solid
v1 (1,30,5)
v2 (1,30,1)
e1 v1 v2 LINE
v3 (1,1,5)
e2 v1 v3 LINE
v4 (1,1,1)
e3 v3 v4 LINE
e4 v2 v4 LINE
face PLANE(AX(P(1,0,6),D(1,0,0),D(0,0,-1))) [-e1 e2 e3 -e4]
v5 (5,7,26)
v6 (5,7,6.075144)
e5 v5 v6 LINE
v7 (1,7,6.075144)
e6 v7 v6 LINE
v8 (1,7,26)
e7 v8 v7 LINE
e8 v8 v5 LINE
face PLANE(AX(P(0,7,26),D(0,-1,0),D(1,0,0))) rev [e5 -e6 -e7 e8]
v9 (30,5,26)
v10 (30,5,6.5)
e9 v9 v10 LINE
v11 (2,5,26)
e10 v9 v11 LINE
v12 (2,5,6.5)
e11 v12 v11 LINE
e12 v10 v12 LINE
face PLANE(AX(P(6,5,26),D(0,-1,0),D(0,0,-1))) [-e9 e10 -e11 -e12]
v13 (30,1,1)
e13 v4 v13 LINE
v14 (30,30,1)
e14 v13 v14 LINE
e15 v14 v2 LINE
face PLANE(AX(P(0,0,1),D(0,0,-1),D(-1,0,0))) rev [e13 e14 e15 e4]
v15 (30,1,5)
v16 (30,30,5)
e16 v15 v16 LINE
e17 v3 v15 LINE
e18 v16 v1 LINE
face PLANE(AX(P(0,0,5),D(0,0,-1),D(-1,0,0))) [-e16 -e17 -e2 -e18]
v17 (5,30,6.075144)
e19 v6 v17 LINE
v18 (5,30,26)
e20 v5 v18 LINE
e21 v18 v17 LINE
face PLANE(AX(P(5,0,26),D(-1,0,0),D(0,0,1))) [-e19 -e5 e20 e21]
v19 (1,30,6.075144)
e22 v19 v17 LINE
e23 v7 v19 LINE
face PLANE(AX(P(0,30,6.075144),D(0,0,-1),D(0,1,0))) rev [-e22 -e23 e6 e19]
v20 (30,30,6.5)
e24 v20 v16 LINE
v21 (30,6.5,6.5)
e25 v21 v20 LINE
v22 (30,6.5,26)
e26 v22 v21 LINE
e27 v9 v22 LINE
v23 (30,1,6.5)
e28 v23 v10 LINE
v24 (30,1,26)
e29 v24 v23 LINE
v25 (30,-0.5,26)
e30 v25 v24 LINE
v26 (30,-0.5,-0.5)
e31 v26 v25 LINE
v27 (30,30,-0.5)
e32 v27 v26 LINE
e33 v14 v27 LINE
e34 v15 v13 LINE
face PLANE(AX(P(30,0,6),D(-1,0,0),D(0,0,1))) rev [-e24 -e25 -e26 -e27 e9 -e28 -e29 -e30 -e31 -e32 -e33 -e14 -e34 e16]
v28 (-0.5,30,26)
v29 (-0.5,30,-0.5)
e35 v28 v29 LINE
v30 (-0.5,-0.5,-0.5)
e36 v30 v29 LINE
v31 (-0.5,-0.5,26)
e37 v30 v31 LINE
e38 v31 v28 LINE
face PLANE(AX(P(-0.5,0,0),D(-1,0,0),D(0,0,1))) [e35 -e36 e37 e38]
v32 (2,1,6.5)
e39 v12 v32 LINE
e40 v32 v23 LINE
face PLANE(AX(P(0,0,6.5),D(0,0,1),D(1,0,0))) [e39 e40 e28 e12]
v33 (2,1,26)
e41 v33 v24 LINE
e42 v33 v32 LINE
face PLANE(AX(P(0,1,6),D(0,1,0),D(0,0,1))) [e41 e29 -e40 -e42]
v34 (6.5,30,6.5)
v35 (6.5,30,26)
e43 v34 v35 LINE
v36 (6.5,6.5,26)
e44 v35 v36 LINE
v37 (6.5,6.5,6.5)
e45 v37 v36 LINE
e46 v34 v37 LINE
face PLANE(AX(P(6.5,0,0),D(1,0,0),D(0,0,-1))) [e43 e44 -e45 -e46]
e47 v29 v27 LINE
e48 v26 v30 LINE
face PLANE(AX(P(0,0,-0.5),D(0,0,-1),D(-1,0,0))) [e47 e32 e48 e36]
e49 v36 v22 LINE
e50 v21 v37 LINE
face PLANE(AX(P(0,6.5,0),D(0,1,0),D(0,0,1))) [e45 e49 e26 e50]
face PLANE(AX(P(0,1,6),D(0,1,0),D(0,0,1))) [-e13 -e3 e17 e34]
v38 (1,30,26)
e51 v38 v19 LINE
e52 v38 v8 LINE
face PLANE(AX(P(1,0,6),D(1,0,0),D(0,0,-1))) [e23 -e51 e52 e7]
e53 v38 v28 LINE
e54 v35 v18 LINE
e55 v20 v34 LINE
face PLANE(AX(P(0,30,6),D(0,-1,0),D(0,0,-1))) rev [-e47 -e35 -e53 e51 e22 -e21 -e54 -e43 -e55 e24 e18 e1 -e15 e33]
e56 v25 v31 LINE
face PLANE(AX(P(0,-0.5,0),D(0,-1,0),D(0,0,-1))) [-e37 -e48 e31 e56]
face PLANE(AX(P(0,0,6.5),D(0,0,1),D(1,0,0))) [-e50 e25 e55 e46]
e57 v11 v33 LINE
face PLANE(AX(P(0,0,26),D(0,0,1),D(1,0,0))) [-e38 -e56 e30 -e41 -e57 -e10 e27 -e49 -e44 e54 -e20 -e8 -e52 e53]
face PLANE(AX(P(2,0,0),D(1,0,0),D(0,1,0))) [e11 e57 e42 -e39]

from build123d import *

# Parameters (mm, degrees)
SKETCH1_W            = 30
SKETCH1_H            = 30
BOSS_EXTRUDE1_DEPTH  = 6
BOSS_EXTRUDE4_DEPTH  = 20
SKETCH4_W            = 2
SKETCH4_H            = 2
BOSS_EXTRUDE6_DEPTH  = 20
SKETCH5_W            = 24
SKETCH5_H            = 6
BOSS_EXTRUDE7_DEPTH  = 20
SHELL2_START         = 7
SHELL2_DEPTH         = 23
SHELL2_START_2       = 1
SHELL2_2_DEPTH       = 4
SHELL2_START_3       = 5
SHELL2_3_OUTLINE_W   = 29
SHELL2_3_OUTLINE_H   = 4
SHELL2_3_DEPTH       = 2
SKETCH7_W            = 23
SKETCH7_H            = 1
BOSS_EXTRUDE8_DEPTH  = 5
SKETCH9_W            = 1.075143629
SKETCH9_H            = 23
BOSS_EXTRUDE9_DEPTH  = 5
SKETCH10_W           = 4
SKETCH10_H           = 23
CUT_EXTRUDE1_DEPTH   = 10
SKETCH11_W           = 23
SKETCH11_H           = 4
CUT_EXTRUDE2_DEPTH   = 10
BOSS_EXTRUDE10_DEPTH = 20
SKETCH13_W           = 20
SKETCH13_H           = 4
CUT_EXTRUDE3_DEPTH   = 5
SKETCH14_W           = 30
SKETCH14_H           = 26
BOSS_EXTRUDE11_DEPTH = 0.5
SKETCH15_W           = 26
SKETCH15_H           = 30.5
BOSS_EXTRUDE12_DEPTH = 0.5
SKETCH16_W           = 20
SKETCH16_H           = 24
BOSS_EXTRUDE13_DEPTH = 0.5
SKETCH19_W           = 30.5
SKETCH19_H           = 30.5
BOSS_EXTRUDE14_DEPTH = 0.5
SKETCH20_W           = 23.5
SKETCH20_H           = 24
BOSS_EXTRUDE15_DEPTH = 0.5
SKETCH21_W           = 23.5
SKETCH21_H           = 19.5
BOSS_EXTRUDE16_DEPTH = 0.5
SKETCH25_W           = 28
SKETCH25_H           = 4
BOSS_EXTRUDE17_DEPTH = 0.5


# Read off the part's stored shape, not the designer's step: Shell2
with BuildPart() as part:
    # Sketch1 → Boss-Extrude1 (new body)
    with BuildSketch(Plane.XY):
        with Locations((15, 15)):
            Rectangle(SKETCH1_W, SKETCH1_H)
    extrude(amount=BOSS_EXTRUDE1_DEPTH)

    # Sketch2 → Boss-Extrude4 (add)
    with BuildSketch(Plane.XY.offset(6)):
        Polygon((5, 6), (6, 6), (6, 30), (0, 30), (0, 6), align=None)
    extrude(amount=BOSS_EXTRUDE4_DEPTH)

    # Sketch4 → Boss-Extrude6 (add)
    with BuildSketch(Plane.XY.offset(6)):
        with Locations((5, 5)):
            Rectangle(SKETCH4_W, SKETCH4_H)
    extrude(amount=BOSS_EXTRUDE6_DEPTH)

    # Sketch5 → Boss-Extrude7 (add)
    with BuildSketch(Plane.XY.offset(6)):
        with Locations((18, 3)):
            Rectangle(SKETCH5_W, SKETCH5_H)
    extrude(amount=BOSS_EXTRUDE7_DEPTH)

    # Shell2 outline → Shell2 (cut)
    with BuildSketch(Plane(origin=(0, 0, 0), x_dir=(1, 0, 0), z_dir=(0, 1, 0)).offset(SHELL2_START)):
        Polygon((5, -5), (30, -5), (30, -1), (1, -1), (1, -25), (5, -25), align=None)
    extrude(amount=SHELL2_DEPTH, mode=Mode.SUBTRACT)

    # Shell2 2 outline → Shell2 2 (cut)
    with BuildSketch(Plane(origin=(0, 0, 0), x_dir=(1, 0, 0), z_dir=(0, 1, 0)).offset(SHELL2_START_2)):
        Polygon((7, -5), (7, -25), (30, -25), (30, -1), (1, -1), (1, -5), align=None)
    extrude(amount=SHELL2_2_DEPTH, mode=Mode.SUBTRACT)

    # Shell2 3 outline → Shell2 3 (cut)
    with BuildSketch(Plane(origin=(0, 0, 0), x_dir=(1, 0, 0), z_dir=(0, 1, 0)).offset(SHELL2_START_3)):
        with Locations((15.5, -3)):
            Rectangle(SHELL2_3_OUTLINE_W, SHELL2_3_OUTLINE_H)
    extrude(amount=SHELL2_3_DEPTH, mode=Mode.SUBTRACT)

    # Sketch7 → Boss-Extrude8 (add)
    with BuildSketch(Plane.XZ.offset(-5)):
        with Locations((18.5, 5.5)):
            Rectangle(SKETCH7_W, SKETCH7_H)
    extrude(amount=BOSS_EXTRUDE8_DEPTH)

    # Sketch9 → Boss-Extrude9 (add)
    with BuildSketch(Plane.ZY.offset(-5)):
        with Locations((5.537571814, 18.5)):
            Rectangle(SKETCH9_W, SKETCH9_H)
    extrude(amount=BOSS_EXTRUDE9_DEPTH)

    # Sketch10 → Cut-Extrude1 (cut)
    with BuildSketch(Plane.XY.offset(26)):
        with Locations((3, 18.5)):
            Rectangle(SKETCH10_W, SKETCH10_H)
    extrude(amount=-CUT_EXTRUDE1_DEPTH, mode=Mode.SUBTRACT)

    # Sketch11 → Cut-Extrude2 (cut)
    with BuildSketch(Plane.XY.offset(26)):
        with Locations((18.5, 3)):
            Rectangle(SKETCH11_W, SKETCH11_H)
    extrude(amount=-CUT_EXTRUDE2_DEPTH, mode=Mode.SUBTRACT)

    # Sketch12 → Boss-Extrude10 (add)
    with BuildSketch(Plane.XY.offset(6)):
        Polygon((6, 0), (6, 4), (4, 4), (4, 6), (0, 6), (0, 0), align=None)
    extrude(amount=BOSS_EXTRUDE10_DEPTH)

    # Sketch13 → Cut-Extrude3 (cut)
    with BuildSketch(Plane(origin=(7, 0, 0), x_dir=(0, 0, -1), z_dir=(1, 0, 0))):
        with Locations((-16, 3)):
            Rectangle(SKETCH13_W, SKETCH13_H)
    extrude(amount=-CUT_EXTRUDE3_DEPTH, mode=Mode.SUBTRACT)

    # Sketch14 → Boss-Extrude11 (add)
    with BuildSketch(Plane.XZ):
        with Locations((15, 13)):
            Rectangle(SKETCH14_W, SKETCH14_H)
    extrude(amount=BOSS_EXTRUDE11_DEPTH)

    # Sketch15 → Boss-Extrude12 (add)
    with BuildSketch(Plane.ZY):
        with Locations((13, 14.75)):
            Rectangle(SKETCH15_W, SKETCH15_H)
    extrude(amount=BOSS_EXTRUDE12_DEPTH)

    # Sketch16 → Boss-Extrude13 (add)
    with BuildSketch(Plane(origin=(6, 0, 0), x_dir=(0, 0, -1), z_dir=(1, 0, 0))):
        with Locations((-16, 18)):
            Rectangle(SKETCH16_W, SKETCH16_H)
    extrude(amount=BOSS_EXTRUDE13_DEPTH)

    # Sketch19 → Boss-Extrude14 (add)
    with BuildSketch(Plane(origin=(0, 0, 0), x_dir=(-1, 0, 0), z_dir=(0, 0, -1))):
        with Locations((-14.75, 14.75)):
            Rectangle(SKETCH19_W, SKETCH19_H)
    extrude(amount=BOSS_EXTRUDE14_DEPTH)

    # Sketch20 → Boss-Extrude15 (add)
    with BuildSketch(Plane.XY.offset(6)):
        with Locations((18.25, 18)):
            Rectangle(SKETCH20_W, SKETCH20_H)
    extrude(amount=BOSS_EXTRUDE15_DEPTH)

    # Sketch21 → Boss-Extrude16 (add)
    with BuildSketch(Plane(origin=(0, 6, 0), x_dir=(1, 0, 0), z_dir=(0, 1, 0))):
        with Locations((18.25, -16.25)):
            Rectangle(SKETCH21_W, SKETCH21_H)
    extrude(amount=BOSS_EXTRUDE16_DEPTH)

    # Sketch25 → Boss-Extrude17 (add)
    with BuildSketch(Plane.XY.offset(6)):
        with Locations((16, 3)):
            Rectangle(SKETCH25_W, SKETCH25_H)
    extrude(amount=BOSS_EXTRUDE17_DEPTH)


solid = part.part
